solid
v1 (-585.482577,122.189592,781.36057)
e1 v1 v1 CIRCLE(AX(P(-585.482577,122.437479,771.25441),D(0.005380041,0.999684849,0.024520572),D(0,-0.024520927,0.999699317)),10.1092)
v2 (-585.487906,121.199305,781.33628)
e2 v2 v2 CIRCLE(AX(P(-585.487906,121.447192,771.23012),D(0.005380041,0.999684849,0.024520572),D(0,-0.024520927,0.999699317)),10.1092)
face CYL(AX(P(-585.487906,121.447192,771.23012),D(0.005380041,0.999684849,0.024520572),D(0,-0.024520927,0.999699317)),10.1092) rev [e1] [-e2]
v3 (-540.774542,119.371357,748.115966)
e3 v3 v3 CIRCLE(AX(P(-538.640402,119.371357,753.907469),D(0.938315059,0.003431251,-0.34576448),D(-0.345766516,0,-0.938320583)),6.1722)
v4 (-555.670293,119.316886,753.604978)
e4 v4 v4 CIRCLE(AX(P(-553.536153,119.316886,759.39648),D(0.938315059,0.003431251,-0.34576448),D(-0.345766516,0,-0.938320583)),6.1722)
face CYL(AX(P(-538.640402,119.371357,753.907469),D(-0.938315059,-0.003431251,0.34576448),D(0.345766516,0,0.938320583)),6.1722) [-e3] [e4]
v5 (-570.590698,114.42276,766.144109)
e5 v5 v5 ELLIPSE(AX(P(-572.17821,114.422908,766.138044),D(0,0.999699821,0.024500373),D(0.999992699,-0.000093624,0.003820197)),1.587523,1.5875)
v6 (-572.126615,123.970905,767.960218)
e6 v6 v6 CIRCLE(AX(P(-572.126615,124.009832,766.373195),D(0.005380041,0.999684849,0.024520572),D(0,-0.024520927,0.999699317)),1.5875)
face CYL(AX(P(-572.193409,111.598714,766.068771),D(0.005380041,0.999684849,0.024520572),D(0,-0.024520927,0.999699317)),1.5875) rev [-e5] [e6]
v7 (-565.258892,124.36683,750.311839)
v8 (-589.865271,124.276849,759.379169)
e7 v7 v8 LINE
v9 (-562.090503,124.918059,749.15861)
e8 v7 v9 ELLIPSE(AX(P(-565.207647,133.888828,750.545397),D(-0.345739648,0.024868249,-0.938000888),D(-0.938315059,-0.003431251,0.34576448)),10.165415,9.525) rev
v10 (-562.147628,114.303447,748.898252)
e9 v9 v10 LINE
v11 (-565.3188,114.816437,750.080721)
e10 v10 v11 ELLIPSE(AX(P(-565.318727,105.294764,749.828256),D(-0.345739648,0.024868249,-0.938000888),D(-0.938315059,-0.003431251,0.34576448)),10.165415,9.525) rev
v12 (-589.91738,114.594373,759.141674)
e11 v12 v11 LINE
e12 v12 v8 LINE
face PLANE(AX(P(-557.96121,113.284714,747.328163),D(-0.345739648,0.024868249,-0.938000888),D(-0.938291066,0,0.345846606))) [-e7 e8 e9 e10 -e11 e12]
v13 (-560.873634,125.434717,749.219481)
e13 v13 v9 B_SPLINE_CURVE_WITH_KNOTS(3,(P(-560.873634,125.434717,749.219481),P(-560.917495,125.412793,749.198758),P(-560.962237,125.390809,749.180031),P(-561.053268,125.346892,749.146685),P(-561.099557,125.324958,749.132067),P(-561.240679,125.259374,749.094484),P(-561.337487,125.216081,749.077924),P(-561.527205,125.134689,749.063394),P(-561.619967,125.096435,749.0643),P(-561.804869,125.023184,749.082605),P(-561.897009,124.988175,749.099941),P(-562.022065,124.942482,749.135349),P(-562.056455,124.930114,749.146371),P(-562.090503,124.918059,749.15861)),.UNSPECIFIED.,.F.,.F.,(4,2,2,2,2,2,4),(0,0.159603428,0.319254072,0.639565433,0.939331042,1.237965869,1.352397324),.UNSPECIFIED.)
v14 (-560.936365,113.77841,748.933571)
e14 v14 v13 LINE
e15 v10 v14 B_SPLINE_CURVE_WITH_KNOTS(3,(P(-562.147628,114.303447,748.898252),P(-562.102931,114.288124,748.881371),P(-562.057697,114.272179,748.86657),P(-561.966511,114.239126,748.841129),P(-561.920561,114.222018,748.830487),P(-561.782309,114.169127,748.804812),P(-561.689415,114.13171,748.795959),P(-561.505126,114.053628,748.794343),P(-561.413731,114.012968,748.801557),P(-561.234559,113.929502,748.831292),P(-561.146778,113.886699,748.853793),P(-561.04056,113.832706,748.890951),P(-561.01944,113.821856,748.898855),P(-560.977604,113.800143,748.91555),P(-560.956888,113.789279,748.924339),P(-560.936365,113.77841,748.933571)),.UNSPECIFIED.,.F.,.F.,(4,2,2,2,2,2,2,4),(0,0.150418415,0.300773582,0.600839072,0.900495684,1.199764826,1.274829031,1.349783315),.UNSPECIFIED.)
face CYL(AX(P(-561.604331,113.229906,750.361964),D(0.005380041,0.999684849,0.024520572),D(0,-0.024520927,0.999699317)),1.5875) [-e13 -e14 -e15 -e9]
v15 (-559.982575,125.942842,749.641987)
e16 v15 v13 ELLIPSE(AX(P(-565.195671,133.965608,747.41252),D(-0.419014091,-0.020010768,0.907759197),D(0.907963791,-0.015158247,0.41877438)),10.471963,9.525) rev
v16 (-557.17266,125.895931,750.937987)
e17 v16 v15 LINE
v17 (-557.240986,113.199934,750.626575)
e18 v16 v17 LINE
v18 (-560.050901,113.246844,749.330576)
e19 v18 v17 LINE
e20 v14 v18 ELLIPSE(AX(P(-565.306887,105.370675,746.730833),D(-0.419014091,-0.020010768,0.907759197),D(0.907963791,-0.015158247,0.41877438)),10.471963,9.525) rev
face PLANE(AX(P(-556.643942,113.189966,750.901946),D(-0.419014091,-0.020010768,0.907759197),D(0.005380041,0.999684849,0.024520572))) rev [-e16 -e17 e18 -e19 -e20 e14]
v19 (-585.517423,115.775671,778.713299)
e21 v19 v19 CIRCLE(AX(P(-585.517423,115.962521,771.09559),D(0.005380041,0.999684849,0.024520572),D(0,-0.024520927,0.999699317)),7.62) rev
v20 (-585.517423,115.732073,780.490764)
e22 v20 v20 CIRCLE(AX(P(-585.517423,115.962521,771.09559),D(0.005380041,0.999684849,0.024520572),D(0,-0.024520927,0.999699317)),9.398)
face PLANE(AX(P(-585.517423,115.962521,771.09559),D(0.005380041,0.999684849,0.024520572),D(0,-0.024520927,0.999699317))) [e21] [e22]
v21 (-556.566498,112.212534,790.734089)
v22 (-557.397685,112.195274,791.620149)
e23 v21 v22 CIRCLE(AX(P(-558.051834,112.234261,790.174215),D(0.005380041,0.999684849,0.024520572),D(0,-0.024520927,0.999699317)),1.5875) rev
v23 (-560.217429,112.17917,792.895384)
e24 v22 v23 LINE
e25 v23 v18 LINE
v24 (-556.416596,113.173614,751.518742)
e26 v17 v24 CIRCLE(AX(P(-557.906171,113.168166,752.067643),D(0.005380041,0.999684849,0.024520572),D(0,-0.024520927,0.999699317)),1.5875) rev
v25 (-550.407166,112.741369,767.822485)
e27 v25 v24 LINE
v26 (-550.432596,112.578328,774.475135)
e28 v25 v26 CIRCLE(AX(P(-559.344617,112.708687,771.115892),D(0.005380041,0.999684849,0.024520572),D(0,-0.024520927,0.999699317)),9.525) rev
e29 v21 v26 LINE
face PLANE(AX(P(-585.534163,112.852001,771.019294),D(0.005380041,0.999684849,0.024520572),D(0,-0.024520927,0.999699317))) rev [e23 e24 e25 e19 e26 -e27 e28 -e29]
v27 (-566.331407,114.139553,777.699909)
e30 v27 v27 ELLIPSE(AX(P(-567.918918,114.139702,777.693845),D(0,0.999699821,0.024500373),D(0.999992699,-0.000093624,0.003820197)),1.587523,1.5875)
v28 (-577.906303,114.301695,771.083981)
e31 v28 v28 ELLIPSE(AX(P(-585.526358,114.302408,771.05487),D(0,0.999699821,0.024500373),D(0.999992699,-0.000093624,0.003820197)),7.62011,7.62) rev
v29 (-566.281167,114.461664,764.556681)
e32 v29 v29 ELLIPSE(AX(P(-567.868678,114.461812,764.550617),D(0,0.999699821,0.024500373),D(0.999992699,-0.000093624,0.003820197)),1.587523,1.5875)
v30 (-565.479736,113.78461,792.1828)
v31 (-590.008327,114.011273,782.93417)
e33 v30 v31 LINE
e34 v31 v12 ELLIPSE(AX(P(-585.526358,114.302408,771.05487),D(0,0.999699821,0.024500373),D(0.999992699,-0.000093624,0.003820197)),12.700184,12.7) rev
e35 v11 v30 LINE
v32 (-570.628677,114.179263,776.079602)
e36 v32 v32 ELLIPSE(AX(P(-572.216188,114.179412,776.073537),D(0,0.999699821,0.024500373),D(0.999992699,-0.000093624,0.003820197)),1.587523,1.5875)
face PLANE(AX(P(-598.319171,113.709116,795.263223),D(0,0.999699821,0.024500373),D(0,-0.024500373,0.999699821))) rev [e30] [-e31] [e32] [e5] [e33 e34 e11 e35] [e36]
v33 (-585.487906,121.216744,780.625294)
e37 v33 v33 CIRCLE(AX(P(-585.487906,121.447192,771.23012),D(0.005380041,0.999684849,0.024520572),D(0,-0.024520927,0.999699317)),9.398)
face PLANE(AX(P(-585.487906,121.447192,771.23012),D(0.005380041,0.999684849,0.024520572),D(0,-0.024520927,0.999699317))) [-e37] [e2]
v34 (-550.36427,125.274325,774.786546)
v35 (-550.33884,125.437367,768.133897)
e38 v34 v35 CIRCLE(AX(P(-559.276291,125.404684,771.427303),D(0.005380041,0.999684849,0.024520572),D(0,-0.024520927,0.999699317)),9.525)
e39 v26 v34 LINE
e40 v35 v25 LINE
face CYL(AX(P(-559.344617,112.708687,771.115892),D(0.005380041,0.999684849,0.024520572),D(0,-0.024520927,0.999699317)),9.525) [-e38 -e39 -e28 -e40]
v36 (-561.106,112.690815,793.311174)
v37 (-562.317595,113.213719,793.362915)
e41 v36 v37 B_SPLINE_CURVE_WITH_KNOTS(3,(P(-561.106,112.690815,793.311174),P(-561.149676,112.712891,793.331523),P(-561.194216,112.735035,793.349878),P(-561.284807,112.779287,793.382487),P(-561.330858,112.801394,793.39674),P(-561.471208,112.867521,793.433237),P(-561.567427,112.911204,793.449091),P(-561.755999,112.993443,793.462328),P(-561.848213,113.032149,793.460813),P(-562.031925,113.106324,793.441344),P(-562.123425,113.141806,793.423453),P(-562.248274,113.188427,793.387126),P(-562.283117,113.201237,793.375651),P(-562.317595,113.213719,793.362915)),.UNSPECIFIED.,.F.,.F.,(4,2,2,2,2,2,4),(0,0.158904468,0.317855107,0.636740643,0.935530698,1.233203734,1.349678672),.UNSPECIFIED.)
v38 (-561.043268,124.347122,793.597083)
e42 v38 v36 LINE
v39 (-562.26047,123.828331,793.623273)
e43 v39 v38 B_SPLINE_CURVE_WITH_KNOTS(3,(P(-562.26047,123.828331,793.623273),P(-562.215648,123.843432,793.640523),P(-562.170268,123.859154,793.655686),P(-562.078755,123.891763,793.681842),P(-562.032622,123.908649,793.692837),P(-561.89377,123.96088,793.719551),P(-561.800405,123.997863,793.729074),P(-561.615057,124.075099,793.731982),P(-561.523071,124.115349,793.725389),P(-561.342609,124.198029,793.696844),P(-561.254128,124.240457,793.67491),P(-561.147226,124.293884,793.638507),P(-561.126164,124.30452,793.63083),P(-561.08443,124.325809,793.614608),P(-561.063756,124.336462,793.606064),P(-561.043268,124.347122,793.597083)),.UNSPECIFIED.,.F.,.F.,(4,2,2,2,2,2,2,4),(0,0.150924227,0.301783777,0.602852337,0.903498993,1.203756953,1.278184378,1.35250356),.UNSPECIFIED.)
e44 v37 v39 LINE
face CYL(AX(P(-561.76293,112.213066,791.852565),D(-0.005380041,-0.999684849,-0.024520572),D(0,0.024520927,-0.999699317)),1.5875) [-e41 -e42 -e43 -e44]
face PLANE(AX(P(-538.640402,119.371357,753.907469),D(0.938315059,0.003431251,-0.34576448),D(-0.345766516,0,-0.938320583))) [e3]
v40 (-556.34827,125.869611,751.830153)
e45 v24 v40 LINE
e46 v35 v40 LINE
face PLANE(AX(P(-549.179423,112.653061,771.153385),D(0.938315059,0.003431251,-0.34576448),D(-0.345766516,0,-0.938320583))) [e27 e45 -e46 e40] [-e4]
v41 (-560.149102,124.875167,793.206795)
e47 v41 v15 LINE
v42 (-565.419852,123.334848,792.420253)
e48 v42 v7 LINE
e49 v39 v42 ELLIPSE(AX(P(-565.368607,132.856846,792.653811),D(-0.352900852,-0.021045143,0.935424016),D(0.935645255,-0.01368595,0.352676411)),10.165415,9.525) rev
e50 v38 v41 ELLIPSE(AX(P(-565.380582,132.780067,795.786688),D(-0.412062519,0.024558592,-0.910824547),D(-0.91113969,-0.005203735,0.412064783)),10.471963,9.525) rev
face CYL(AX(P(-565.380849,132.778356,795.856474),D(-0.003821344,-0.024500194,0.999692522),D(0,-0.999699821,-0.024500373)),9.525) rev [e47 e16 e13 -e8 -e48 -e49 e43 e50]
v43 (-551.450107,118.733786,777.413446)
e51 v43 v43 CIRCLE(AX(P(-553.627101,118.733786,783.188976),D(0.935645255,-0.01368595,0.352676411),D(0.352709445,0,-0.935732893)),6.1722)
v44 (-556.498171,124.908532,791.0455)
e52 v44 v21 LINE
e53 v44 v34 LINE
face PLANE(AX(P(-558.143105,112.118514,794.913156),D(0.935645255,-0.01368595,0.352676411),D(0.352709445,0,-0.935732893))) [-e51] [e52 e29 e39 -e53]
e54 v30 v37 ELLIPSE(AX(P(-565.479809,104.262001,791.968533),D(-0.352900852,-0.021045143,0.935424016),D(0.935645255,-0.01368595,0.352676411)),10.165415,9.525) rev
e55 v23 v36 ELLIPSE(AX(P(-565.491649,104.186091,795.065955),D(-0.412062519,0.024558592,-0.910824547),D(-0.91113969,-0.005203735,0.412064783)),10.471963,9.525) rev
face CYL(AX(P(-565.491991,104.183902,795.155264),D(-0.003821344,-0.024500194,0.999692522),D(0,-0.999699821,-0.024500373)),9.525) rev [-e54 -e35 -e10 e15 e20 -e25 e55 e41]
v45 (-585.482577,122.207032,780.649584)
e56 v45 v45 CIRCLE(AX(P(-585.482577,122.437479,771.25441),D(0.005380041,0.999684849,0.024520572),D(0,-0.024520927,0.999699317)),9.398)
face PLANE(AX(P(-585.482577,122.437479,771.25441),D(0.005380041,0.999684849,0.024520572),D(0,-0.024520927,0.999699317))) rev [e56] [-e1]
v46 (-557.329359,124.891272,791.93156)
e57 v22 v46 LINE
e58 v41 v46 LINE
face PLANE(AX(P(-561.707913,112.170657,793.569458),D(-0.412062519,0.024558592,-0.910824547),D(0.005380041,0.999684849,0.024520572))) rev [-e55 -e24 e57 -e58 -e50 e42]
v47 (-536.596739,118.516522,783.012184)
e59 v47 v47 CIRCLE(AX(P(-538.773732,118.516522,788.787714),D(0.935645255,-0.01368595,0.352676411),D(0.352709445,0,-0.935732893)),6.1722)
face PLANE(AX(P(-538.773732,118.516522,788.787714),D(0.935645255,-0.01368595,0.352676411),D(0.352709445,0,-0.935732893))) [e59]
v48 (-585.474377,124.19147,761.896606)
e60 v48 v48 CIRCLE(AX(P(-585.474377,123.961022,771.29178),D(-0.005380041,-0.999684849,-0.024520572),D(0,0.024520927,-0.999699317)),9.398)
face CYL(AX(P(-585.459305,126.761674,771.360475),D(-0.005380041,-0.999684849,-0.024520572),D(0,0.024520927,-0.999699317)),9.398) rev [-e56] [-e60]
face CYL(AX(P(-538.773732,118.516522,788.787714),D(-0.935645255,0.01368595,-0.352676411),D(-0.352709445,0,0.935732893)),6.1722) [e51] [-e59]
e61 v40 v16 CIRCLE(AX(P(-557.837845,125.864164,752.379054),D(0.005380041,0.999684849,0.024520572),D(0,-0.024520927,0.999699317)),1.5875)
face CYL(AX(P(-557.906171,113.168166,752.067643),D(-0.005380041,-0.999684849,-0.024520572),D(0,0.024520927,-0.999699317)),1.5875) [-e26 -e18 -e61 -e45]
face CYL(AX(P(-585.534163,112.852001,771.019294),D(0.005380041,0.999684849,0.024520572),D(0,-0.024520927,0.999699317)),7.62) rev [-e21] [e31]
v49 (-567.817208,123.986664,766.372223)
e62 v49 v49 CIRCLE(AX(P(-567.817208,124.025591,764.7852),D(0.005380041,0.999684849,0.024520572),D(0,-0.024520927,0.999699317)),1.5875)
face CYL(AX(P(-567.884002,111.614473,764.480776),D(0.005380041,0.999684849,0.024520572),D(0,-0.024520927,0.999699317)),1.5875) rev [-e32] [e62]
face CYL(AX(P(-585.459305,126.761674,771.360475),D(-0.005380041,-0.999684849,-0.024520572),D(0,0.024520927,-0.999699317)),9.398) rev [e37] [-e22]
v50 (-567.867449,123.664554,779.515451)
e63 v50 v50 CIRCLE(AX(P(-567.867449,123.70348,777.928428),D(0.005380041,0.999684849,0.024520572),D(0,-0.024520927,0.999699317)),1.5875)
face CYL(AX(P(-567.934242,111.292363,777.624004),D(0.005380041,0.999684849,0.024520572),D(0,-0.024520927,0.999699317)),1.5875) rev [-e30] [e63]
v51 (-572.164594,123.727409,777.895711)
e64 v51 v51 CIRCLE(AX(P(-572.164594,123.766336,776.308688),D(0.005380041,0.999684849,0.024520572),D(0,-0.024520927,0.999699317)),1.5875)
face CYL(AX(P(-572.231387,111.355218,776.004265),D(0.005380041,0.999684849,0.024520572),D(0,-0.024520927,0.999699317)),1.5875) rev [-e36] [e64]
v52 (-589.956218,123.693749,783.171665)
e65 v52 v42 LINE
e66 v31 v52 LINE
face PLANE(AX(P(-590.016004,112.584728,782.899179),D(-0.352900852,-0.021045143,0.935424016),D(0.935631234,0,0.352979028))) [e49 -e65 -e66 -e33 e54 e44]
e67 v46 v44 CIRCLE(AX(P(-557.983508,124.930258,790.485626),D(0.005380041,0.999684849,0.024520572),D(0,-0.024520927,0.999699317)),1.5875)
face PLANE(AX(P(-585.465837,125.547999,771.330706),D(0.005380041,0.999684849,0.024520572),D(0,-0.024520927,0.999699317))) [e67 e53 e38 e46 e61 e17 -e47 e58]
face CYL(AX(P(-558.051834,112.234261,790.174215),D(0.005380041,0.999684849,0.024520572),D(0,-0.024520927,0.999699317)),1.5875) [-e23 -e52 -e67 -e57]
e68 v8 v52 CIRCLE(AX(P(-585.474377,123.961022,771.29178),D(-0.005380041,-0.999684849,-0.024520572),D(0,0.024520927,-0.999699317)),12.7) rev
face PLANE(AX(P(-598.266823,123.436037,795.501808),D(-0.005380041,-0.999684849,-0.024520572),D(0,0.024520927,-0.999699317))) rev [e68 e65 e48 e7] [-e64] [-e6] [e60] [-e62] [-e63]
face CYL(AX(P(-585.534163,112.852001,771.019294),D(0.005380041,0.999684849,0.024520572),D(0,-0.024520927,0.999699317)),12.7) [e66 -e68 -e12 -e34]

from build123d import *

# Parameters (mm, degrees)
WISHBONE_END_BASE_BODY_DEPTH           = 6.35
WISHBONE_END_BASE_BODY_DEPTH_BACK      = 6.35
WISHBONE_END_BODY_SKETCH_R             = 7.6199999999999655
SPHERICAL_BEARING_BORE_HOLE_DEPTH      = 994.1778562213065
SPHERICAL_BEARING_BORE_HOLE_DEPTH_BACK = 3.2385
SKETCH37_R                             = 9.398000000000074
GROOVE_START                           = 3.2385
SKETCH38_R                             = 10.10920000000004
GROOVE_FOR_99142A390_DEPTH             = 0.9905999999999999
SKETCH39_R                             = 6.172199999999972
LEADING_ARM_TUBE_INSERT_DEPTH          = 15.875
SKETCH40_R                             = 6.172199999999972
TRAILING_ARM_TUBE_INSERT_DEPTH         = 15.875
CUT_EXTRUDE3_DEPTH                     = 614.178901904527
CUT_EXTRUDE3_DEPTH_BACK                = 614.178901904527
FILLET1_R                              = 9.525
CHAMFER1_SIZE                          = 3.8099999999999996
FILLET2_R                              = 9.525
FILLET3_R                              = 1.5875
SKETCH42_R                             = 1.587499999999916
SKETCH42_R_2                           = 1.5874999999997772
SKETCH42_R_3                           = 1.5875000000002346
MACHINING_ALIGNMENT_HOLES_DEPTH        = 993.6874865506448


with BuildPart() as part:
    # wishbone end body sketch → wishbone end base body (new, two sides: drawn at the far end of the back side and taken through both)
    with BuildSketch(Plane(origin=(0.7258862866452951, 134.87955098448836, 3.3083663449025464), x_dir=(0.999985527474362, -0.005378423373816958, -0.00013192359218796315), z_dir=(0.005380041061385716, 0.9996848486991856, 0.024520571760546048)).offset(-WISHBONE_END_BASE_BODY_DEPTH_BACK)):
        with BuildLine():
            Line((-590.7162762655777, -779.9030929511134), (-558.8429156016132, -791.9248886865561))
            Line((-558.8429156016132, -791.9248886865561), (-549.8791042276648, -768.1591552526331))
            Line((-549.8791042276648, -768.1591552526331), (-558.6610183956265, -744.3256078132241))
            Line((-558.6610183956265, -744.3256078132241), (-590.6253276625844, -756.1034525144474))
            ThreePointArc((-590.6253276625844, -756.1034525144474), (-598.9342778486073, -767.9716944579083), (-590.7162762655777, -779.9030929511134))
        make_face()
        with Locations(Location((-586.2343705786035, -768.0202262341521, 0), (0, 0, 270))):
            Circle(WISHBONE_END_BODY_SKETCH_R, mode=Mode.SUBTRACT)
    extrude(amount=WISHBONE_END_BASE_BODY_DEPTH + WISHBONE_END_BASE_BODY_DEPTH_BACK)

    # Sketch37 → spherical bearing bore hole (cut, two sides: drawn at the far end of the back side and taken through both)
    with BuildSketch(Plane(origin=(0.7258862866452951, 134.87955098448836, 3.3083663449025464), x_dir=(0.999985527474362, -0.005378423373816958, -0.00013192359218796315), z_dir=(0.005380041061385716, 0.9996848486991856, 0.024520571760546048)).offset(-SPHERICAL_BEARING_BORE_HOLE_DEPTH_BACK)):
        with Locations(Location((-586.2343705786035, -768.0202262341521, 0), (0, 0, 270))):
            Circle(SKETCH37_R)
    extrude(amount=SPHERICAL_BEARING_BORE_HOLE_DEPTH + SPHERICAL_BEARING_BORE_HOLE_DEPTH_BACK, mode=Mode.SUBTRACT)

    # Sketch38 → groove for 99142A390 (cut)
    with BuildSketch(Plane(origin=(0.7258862866452951, 134.87955098448836, 3.3083663449025464), x_dir=(0.999985527474362, -0.005378423373816958, -0.00013192359218796315), z_dir=(0.005380041061385716, 0.9996848486991856, 0.024520571760546048)).offset(GROOVE_START)):
        with Locations(Location((-586.2343705786035, -768.0202262341521, 0), (0, 0, 270))):
            Circle(SKETCH38_R)
    extrude(amount=-GROOVE_FOR_99142A390_DEPTH, mode=Mode.SUBTRACT)

    # Sketch39 → leading arm tube insert (add)
    with BuildSketch(Plane(origin=(-227.74660652476513, 3.3313146383369725, -85.84541568022186), x_dir=(0.3526386884421761, -0.005158146778901092, -0.9357453440630037), z_dir=(0.9356452552652121, -0.013685950287986396, 0.3526764112673413))):
        with Locations(Location((-928.7082188867262, 110.62389056036547, 0), (0, 0, 0.295569033))):
            Circle(SKETCH39_R)
    extrude(amount=LEADING_ARM_TUBE_INSERT_DEPTH)

    # Sketch40 → trailing arm tube insert (add)
    with BuildSketch(Plane(origin=(-733.3441053167152, -2.681708402002071, 270.23369281713326), x_dir=(-0.3457621685662157, -0.0012643904898342719, -0.938321333075763), z_dir=(0.9383150593615196, 0.003431250568691938, -0.34576448038357405))):
        with Locations(Location((-521.3169196855705, 121.34025761798294, 0), (0, 0, 0.072444684))):
            Circle(SKETCH40_R)
    extrude(amount=TRAILING_ARM_TUBE_INSERT_DEPTH)

    # Sketch41 → Cut-Extrude3 (cut, two sides: drawn at the far end of the back side and taken through both)
    with BuildSketch(Plane(origin=(-2.943409073321915, -18.871393740527775, 770.0180176181074), x_dir=(-0.9999926986368375, 9.362436458525497e-05, -0.003820197310804283), z_dir=(0.0038213443989151604, 0.024500194493421494, -0.9996925216269098)).offset(-CUT_EXTRUDE3_DEPTH_BACK)):
        Polygon((595.2948241213879, 131.77671300237452), (595.2873859667309, 133.15922897461502), (557.1948241213879, 133.159228974615), (557.1948241213879, 131.571728974615), align=None)
        Polygon((595.2350378549631, 142.88907514922224), (557.126497101028, 142.68404517085534), (557.126497101028, 144.27154517085532), (595.226497101028, 144.47652919861486), align=None)
    extrude(amount=CUT_EXTRUDE3_DEPTH + CUT_EXTRUDE3_DEPTH_BACK, mode=Mode.SUBTRACT)

    # Fillet1
    # the kernel refuses this fillet: 9.525 mm, written as the material it adds along each edge
    with BuildSketch(Plane(origin=(-560.2724336268298, 113.41353360474875, 807.3240128802753), x_dir=(-3.2942809255927247e-12, -0.9996998207983545, -0.02450037337955774), z_dir=(0.0038213443989151483, 0.024500194493421494, -0.9996925216269098))) as fillet1_piece_1_section:
        with BuildLine():
            CenterArc((9.525000000017343, 5.265141854675068), FILLET1_R, 179.99999999981125, 33.55730976200755)
            Line((1.734599e-11, 5.265141854706447), (-0.19049999998265063, 5.265141854707075))
            Line((-0.19049999998265063, 5.265141854707075), (-0.1904999999999994, 6.2734e-13))
            Line((-0.1904999999999994, 6.2734e-13), (-6.2619e-13, -0.19050000000003728))
            ThreePointArc((-6.2619e-13, -0.19050000000003728), (0.7937500000033896, -0.19050000000265227), (1.4287500000078057, -0.10530283709351278))
            Line((1.4287500000078057, -0.10530283709351278), (1.5875000000079915, 0))
        make_face()
    fillet1_piece_1 = extrude(amount=72.36652834652159, mode=Mode.PRIVATE)
    fillet1_piece_1 = split(fillet1_piece_1, bisect_by=Plane(origin=(-569.064048669562, 113.51391058502266, 790.8244812436348), z_dir=(0.35290085216371403, 0.021045143050144578, -0.9354240164204272)), keep=Keep.TOP, mode=Mode.PRIVATE)
    fillet1_piece_1 = split(fillet1_piece_1, bisect_by=Plane(origin=(-568.9133352872509, 114.4801954294582, 751.396723516925), z_dir=(0.34573964848360106, -0.024868248849107495, 0.9380008878810375)), keep=Keep.TOP, mode=Mode.PRIVATE)
    add(fillet1_piece_1)
    with BuildSketch(Plane(origin=(-559.9274640787987, 124.70915530829745, 735.1857328131279), x_dir=(-0.9999782260055279, 0.005472088364658121, -0.0036883280448706773), z_dir=(-0.0038213443989151483, -0.024500194493421494, 0.9996925216269098))) as fillet1_piece_2_section:
        with BuildLine():
            CenterArc((5.273648095245833, -9.525000000000006), FILLET1_R, 89.99999999999999, 33.55705973982701)
            Line((0.00854087754486855, -1.5874770245300465), (-0.09676126680913032, -1.4287265650206478))
            ThreePointArc((-0.09676126680913032, -1.4287265650206478), (-0.18622680417126483, -0.794763417570426), (-0.19049724294364254, -0.0010249053053967))
            Line((-0.19049724294364254, -0.0010249053053967), (-2.955e-14, 0.19049999999999728))
            Line((-2.955e-14, 0.19049999999999728), (5.2736480952458065, 0.1904999999999973))
            Line((5.2736480952458065, 0.1904999999999973), (5.273648095245836, 0))
        make_face()
    fillet1_piece_2 = extrude(amount=72.42179621801027, mode=Mode.PRIVATE)
    fillet1_piece_2 = split(fillet1_piece_2, bisect_by=Plane(origin=(-569.0001389759076, 123.73065535763696, 791.0784480398987), z_dir=(0.35290085216371403, 0.021045143050144578, -0.9354240164204272)), keep=Keep.TOP, mode=Mode.PRIVATE)
    fillet1_piece_2 = split(fillet1_piece_2, bisect_by=Plane(origin=(-568.8494001928565, 124.697103483473, 751.6440278829348), z_dir=(0.34573964848360106, -0.024868248849107495, 0.9380008878810375)), keep=Keep.TOP, mode=Mode.PRIVATE)
    add(fillet1_piece_2)

    # Chamfer1
    chamfer1_edges = [part.edges().sort_by_distance(p)[0] for p in [
        (-558.1089414465442, 118.46651268395277, 795.0688611446163),
        (-557.9270468730695, 119.63271283819378, 747.4838685753589),
    ]]
    chamfer(chamfer1_edges, length=CHAMFER1_SIZE)

    # Fillet2
    fillet2_edges = [part.edges().sort_by_distance(p)[0] for p in [
        (-549.1452598015858, 119.00105931742645, 771.3090911275373),
    ]]
    fillet(fillet2_edges, radius=FILLET2_R)

    # Fillet3
    fillet3_edges = [part.edges().sort_by_distance(p)[0] for p in [
        (-561.5020537397296, 119.61471747963421, 748.801110510107),
        (-561.6737763595983, 118.51373386067205, 793.7250432821822),
        (-556.764389199803, 118.54669467897371, 791.5048956420608),
        (-556.6097788123484, 119.53796481007879, 751.0576519581815),
    ]]
    fillet(fillet3_edges, radius=FILLET3_R)

    # Sketch42 → machining alignment holes (cut, through all)
    with BuildSketch(Plane(origin=(0.7515088558077796, 139.6405730446522, 3.42514613128373), x_dir=(0.9999855274743621, -0.005378423373807206, -0.0001319235921877165), z_dir=(0.005380041061375963, 0.9996848486991857, 0.024520571760544684))):
        with Locations(Location((-568.57694591022, -761.514019457373, 0), (0, 0, 270))):
            Circle(SKETCH42_R)
        with Locations(Location((-568.6271868865741, -774.6611941588587, 0), (0, 0, 270))):
            Circle(SKETCH42_R)
        with Locations(Location((-572.9243944265849, -773.0404001728256, 0), (0, 0, 270))):
            Circle(SKETCH42_R_2)
        with Locations(Location((-572.8864152580355, -763.1019236507452, 0), (0, 0, 270))):
            Circle(SKETCH42_R_3)
    extrude(amount=-MACHINING_ALIGNMENT_HOLES_DEPTH, mode=Mode.SUBTRACT)


solid = part.part
